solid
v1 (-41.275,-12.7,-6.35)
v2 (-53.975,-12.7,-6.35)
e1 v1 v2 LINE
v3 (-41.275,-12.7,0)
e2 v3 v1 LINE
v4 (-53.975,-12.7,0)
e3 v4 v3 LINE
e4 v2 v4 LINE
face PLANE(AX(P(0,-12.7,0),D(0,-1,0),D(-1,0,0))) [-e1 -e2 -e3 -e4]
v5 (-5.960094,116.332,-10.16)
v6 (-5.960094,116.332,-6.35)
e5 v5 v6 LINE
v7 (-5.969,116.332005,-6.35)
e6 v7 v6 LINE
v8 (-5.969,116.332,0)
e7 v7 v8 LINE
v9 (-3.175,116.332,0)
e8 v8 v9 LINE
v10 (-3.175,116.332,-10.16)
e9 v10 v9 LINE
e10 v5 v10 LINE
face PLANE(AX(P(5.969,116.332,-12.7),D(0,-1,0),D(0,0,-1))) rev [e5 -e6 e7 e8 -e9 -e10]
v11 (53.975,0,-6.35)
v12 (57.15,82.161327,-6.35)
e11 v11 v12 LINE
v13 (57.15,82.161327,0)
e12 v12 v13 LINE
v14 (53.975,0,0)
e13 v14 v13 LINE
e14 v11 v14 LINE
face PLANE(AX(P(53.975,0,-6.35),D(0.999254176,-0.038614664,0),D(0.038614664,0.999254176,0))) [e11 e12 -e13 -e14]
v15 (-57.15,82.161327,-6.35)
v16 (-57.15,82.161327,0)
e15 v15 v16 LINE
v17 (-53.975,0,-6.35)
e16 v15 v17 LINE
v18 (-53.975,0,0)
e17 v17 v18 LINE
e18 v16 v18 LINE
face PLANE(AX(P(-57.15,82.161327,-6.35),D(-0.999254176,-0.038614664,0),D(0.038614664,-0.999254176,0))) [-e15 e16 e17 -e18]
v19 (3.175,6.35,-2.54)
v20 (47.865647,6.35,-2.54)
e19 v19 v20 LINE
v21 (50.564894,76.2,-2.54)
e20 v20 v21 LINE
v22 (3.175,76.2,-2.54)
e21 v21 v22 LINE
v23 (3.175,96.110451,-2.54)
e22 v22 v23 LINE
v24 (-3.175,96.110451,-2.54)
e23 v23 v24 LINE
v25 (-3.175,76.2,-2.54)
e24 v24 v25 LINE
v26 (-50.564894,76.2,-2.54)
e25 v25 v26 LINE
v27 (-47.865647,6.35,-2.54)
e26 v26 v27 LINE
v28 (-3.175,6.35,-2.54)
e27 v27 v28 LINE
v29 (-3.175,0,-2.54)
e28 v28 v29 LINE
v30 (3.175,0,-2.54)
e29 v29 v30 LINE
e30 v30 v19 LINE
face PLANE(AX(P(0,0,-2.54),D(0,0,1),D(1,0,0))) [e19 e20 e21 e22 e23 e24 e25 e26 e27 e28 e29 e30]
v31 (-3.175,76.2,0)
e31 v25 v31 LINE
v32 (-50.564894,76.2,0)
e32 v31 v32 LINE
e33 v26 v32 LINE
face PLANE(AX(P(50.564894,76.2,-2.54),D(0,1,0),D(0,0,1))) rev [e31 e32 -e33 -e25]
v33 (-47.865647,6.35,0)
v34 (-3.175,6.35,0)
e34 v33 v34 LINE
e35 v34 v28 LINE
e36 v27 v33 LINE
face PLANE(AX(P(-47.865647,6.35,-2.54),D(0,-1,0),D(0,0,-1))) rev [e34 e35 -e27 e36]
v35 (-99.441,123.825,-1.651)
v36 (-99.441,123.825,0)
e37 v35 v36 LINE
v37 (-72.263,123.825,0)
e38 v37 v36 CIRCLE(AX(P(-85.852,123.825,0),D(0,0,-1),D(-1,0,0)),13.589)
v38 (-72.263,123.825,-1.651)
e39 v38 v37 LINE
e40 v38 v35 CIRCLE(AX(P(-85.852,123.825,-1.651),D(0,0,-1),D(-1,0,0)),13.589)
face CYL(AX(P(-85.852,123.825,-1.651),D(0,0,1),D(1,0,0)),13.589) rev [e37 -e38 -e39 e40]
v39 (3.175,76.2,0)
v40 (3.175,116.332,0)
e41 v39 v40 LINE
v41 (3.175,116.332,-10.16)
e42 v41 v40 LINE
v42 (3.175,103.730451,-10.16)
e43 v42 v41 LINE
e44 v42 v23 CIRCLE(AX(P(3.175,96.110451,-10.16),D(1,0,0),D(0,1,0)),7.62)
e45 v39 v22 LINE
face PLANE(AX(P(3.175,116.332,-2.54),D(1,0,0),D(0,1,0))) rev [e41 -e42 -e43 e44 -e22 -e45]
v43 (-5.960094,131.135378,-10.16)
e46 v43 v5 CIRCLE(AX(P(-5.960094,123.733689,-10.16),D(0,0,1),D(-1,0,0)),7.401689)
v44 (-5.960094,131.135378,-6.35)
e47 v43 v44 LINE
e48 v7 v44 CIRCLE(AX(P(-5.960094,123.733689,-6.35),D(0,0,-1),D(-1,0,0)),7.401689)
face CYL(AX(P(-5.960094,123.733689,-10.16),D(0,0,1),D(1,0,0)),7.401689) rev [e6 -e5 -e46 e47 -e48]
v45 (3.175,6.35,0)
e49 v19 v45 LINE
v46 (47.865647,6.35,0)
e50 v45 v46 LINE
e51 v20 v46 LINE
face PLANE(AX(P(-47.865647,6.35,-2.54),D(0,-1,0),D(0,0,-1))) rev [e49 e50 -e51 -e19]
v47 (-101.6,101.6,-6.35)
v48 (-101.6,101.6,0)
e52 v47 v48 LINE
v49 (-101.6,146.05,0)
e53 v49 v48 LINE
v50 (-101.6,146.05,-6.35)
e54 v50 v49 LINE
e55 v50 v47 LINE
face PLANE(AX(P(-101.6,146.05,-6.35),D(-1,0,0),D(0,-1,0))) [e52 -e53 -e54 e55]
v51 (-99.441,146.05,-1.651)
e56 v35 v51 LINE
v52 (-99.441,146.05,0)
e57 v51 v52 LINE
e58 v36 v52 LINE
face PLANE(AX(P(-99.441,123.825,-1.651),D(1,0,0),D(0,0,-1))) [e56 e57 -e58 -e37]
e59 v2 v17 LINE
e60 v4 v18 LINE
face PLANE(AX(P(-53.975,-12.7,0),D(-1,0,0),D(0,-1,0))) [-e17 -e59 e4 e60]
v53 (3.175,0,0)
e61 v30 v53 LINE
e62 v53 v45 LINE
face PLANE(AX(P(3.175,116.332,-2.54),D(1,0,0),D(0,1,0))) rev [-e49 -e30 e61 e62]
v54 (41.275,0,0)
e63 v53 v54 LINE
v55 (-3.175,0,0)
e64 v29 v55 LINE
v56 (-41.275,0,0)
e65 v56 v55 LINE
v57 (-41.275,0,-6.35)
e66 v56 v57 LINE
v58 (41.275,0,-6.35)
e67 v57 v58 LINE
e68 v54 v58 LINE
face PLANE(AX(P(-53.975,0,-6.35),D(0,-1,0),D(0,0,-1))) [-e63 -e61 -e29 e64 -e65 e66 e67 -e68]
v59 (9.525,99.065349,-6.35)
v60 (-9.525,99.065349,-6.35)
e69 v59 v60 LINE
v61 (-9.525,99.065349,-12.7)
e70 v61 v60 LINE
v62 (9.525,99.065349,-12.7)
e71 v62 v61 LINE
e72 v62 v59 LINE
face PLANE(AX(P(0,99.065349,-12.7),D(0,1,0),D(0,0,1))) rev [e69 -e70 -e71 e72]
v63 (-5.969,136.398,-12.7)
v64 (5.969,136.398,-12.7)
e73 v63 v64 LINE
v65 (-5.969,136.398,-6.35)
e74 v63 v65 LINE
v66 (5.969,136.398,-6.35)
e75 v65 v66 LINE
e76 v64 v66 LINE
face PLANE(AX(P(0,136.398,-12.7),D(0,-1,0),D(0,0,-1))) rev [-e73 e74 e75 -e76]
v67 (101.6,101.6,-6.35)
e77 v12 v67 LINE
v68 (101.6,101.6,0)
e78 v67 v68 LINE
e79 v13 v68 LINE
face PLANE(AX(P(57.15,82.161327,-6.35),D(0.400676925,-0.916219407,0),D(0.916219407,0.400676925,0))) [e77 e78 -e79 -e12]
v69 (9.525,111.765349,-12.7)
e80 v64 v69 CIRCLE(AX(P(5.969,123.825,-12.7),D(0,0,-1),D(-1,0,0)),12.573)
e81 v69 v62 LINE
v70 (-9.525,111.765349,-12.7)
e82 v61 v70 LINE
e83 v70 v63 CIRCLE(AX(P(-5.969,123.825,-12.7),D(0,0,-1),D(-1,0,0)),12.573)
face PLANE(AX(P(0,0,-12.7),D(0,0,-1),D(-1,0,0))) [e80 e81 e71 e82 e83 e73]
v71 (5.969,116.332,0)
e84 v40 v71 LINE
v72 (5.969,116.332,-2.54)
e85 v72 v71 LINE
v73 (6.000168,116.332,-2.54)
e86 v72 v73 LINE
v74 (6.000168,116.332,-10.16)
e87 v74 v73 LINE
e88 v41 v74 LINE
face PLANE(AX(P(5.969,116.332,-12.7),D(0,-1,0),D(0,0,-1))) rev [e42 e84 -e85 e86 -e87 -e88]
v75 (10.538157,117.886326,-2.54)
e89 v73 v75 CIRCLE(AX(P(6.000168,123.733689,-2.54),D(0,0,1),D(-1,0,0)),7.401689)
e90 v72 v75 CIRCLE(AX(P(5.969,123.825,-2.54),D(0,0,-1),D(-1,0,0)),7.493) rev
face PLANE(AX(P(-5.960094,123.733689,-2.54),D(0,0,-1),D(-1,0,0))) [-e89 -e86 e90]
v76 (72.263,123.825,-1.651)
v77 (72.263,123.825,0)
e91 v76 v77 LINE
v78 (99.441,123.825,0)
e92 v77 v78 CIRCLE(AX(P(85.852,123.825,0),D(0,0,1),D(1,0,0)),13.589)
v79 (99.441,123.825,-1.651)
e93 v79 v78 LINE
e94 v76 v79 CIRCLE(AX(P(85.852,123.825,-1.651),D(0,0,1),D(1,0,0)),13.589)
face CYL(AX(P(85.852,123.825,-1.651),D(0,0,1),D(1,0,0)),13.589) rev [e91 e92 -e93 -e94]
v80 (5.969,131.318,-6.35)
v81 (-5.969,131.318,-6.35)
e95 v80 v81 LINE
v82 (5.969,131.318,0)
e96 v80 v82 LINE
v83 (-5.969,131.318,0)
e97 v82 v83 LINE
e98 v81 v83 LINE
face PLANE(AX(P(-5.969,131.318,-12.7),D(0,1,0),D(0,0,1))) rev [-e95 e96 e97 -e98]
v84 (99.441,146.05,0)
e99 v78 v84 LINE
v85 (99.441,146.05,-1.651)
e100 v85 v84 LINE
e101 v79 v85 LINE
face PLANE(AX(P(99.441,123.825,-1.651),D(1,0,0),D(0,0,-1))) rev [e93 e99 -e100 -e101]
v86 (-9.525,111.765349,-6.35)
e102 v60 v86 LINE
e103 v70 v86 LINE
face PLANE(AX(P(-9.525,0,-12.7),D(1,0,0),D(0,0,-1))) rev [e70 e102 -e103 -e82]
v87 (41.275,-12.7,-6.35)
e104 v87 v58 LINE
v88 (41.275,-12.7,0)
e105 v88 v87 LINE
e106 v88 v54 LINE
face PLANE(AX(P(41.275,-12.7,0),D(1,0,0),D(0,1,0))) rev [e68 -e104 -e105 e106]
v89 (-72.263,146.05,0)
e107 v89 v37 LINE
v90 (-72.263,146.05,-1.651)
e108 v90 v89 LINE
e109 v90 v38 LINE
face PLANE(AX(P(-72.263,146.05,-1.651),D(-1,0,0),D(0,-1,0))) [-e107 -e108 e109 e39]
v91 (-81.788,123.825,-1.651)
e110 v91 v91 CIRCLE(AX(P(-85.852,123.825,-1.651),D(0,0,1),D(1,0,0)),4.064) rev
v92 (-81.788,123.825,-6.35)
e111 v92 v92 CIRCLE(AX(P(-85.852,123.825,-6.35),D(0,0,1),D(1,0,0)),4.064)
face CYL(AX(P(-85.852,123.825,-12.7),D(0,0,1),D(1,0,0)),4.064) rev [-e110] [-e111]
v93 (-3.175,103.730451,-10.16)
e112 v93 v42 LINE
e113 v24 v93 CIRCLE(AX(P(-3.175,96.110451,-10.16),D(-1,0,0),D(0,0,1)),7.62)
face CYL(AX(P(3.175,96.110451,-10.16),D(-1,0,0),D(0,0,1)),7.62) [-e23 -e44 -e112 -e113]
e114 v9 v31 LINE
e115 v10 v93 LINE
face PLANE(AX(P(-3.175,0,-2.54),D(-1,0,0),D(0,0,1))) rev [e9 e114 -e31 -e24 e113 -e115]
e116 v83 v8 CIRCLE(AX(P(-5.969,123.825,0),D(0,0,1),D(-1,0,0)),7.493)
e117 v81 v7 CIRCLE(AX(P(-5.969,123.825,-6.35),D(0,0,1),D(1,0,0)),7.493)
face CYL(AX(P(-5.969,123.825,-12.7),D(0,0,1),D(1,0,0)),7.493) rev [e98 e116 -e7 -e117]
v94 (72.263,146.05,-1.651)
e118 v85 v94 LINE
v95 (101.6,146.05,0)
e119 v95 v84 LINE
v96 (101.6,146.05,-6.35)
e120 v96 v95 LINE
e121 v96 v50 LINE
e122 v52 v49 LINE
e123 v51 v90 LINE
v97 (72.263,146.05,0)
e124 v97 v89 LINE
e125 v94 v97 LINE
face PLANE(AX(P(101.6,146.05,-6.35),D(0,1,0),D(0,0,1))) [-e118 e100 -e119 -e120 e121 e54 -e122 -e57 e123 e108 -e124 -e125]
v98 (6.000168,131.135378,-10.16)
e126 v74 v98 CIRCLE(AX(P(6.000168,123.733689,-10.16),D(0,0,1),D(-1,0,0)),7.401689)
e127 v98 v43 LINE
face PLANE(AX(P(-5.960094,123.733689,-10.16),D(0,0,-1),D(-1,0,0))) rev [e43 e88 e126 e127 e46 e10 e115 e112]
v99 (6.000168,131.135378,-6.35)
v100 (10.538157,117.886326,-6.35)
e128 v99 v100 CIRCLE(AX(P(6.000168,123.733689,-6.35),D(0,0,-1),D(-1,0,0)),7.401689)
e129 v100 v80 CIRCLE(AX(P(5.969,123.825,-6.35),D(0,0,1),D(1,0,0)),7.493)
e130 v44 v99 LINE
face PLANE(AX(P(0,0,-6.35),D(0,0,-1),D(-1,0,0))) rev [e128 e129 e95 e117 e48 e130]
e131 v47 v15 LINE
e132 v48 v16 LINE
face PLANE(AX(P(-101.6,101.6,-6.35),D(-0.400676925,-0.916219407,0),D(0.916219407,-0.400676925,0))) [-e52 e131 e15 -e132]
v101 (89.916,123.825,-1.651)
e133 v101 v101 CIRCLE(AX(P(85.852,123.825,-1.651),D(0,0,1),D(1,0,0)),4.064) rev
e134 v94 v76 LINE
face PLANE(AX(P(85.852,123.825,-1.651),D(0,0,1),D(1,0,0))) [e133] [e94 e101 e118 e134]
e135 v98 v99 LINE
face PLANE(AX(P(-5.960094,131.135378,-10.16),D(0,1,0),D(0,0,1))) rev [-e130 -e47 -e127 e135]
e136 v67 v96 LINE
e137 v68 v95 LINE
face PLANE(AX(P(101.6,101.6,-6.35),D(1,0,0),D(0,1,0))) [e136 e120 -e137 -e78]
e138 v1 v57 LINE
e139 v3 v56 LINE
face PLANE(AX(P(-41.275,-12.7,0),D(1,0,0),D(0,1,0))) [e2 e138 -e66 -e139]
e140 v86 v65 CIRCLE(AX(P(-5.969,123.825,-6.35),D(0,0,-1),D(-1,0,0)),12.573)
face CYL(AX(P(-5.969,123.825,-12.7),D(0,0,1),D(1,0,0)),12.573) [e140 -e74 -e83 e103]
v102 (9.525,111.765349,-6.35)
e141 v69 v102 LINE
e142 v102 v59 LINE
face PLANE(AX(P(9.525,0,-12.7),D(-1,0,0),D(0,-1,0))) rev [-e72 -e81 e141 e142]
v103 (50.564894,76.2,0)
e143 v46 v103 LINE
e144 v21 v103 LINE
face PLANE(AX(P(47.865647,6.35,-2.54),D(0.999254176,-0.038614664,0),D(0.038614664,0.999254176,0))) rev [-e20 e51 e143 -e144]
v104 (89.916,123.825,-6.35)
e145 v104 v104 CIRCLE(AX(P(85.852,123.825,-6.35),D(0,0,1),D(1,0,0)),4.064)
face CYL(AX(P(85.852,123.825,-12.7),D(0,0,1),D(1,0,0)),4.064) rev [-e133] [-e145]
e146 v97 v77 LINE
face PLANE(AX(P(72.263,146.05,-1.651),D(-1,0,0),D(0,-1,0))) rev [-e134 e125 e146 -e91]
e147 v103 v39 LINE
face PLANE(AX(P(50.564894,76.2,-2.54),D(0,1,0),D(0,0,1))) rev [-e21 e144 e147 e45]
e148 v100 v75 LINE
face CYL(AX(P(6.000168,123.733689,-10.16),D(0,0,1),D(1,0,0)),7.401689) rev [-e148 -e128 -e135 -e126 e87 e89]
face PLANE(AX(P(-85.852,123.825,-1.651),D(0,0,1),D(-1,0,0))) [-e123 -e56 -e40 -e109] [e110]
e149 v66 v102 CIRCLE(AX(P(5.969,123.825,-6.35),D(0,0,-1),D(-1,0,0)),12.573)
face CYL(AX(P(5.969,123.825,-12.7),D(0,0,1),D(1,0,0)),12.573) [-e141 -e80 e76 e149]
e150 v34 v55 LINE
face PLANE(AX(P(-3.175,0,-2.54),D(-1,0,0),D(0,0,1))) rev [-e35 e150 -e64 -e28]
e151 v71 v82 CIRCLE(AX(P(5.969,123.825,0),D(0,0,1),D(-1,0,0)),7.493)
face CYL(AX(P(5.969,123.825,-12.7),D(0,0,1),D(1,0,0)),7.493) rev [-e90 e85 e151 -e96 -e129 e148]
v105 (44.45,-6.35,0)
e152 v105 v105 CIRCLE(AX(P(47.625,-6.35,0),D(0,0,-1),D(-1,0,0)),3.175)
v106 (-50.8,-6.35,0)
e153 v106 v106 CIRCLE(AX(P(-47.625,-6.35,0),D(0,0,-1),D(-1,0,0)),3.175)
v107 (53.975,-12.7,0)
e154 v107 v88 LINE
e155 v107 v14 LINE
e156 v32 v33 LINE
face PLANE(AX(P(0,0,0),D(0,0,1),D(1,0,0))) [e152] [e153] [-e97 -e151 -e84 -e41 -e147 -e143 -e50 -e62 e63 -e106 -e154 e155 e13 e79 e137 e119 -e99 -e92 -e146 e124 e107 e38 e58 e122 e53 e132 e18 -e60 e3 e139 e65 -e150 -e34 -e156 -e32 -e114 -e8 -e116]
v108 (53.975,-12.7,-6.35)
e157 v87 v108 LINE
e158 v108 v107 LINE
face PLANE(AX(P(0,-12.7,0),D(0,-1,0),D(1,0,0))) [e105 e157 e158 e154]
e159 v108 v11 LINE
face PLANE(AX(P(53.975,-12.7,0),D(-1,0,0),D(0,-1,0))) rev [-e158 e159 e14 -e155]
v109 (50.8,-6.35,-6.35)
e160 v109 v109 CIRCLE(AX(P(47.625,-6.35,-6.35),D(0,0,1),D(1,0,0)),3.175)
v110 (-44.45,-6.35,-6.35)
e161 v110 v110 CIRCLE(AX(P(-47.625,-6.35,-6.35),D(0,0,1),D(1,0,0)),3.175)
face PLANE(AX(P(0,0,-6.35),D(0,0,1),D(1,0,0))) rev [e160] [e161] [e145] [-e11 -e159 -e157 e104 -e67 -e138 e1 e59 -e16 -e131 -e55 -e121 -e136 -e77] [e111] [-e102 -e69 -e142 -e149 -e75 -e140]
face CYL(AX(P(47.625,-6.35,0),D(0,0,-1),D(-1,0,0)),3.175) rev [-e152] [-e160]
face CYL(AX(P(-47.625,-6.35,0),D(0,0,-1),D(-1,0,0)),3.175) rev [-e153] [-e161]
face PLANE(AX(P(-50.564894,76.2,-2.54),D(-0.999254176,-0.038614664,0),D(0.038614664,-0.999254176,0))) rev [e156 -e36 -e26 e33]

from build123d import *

# Parameters (mm, degrees)
MAIN_BODY_DEPTH          = 6.35
BATTERY_SPACING_DEPTH    = 2.54
SKETCH8_R                = 4.064
LIGHT_SOCKETS_DEPTH      = 12.7
LIGHT_LEADS_POCKET_DEPTH = 6.35
WIRE_TRAIL_DEPTH         = 2.54
LEAD_ROOM_DEPTH          = 7.62
FILLET1_R                = 7.62
TAB_SLOTS_DEPTH          = 1.651
SKETCH14_W               = 12.7
SKETCH14_H               = 6.35
SCREW_MOUNT_DEPTH        = 12.7
CUT_EXTRUDE1_DEPTH       = 179.026641265
CUT_EXTRUDE1_DEPTH_BACK  = 179.026641265
SKETCH15_R               = 3.175


# Sheet-metal steps are written as plain solids
with BuildPart() as part:
    # Sketch1 → Main Body (new body)
    with BuildSketch(Plane.XY):
        Polygon((-53.975, 0), (53.975, 0), (57.15, 82.161327118), (101.6, 101.6), (101.6, 146.05), (-101.6, 146.05), (-101.6, 101.6), (-57.15, 82.161327118), align=None)
    extrude(amount=-MAIN_BODY_DEPTH)

    # Sketch7 → Battery Spacing (cut)
    with BuildSketch(Plane.XY):
        Polygon((-50.564894027, 76.2), (-47.86564661, 6.35), (47.86564661, 6.35), (50.564894027, 76.2), align=None)
    extrude(amount=-BATTERY_SPACING_DEPTH, mode=Mode.SUBTRACT)

    # Sketch8 → Light Sockets (cut)
    with BuildSketch(Plane.XY):
        with Locations((85.852, 123.825)):
            Circle(SKETCH8_R)
        with Locations((-85.852, 123.825)):
            Circle(SKETCH8_R)
        with BuildLine():
            Line((-5.969, 131.318), (5.969, 131.318))
            ThreePointArc((5.969, 131.318), (13.462, 123.825), (5.969, 116.332))
            Line((5.969, 116.332), (-5.969, 116.332))
            ThreePointArc((-5.969, 116.332), (-13.462, 123.825), (-5.969, 131.318))
        make_face()
    extrude(amount=-LIGHT_SOCKETS_DEPTH, mode=Mode.SUBTRACT)

    # Sketch9 → Light Leads Pocket (add)
    with BuildSketch(Plane(origin=(0, 0, -6.35), x_dir=(-1, 0, 0), z_dir=(0, 0, -1))):
        with BuildLine():
            Line((-9.525, 111.765348554), (-9.525, 99.065348554))
            Line((-9.525, 99.065348554), (9.525, 99.065348554))
            Line((9.525, 99.065348554), (9.525, 111.765348554))
            ThreePointArc((9.525, 111.765348554), (18.413001098, 125.621431375), (5.969, 136.398))
            Line((5.969, 136.398), (-5.969, 136.398))
            ThreePointArc((-5.969, 136.398), (-18.413001098, 125.621431375), (-9.525, 111.765348554))
        make_face()
    extrude(amount=LIGHT_LEADS_POCKET_DEPTH)

    # Sketch10 → Wire Trail (cut)
    with BuildSketch(Plane.XY):
        Polygon((-3.175, 116.332), (3.175, 116.332), (3.175, 76.2), (3.175, 6.35), (3.175, 0), (-3.175, 0), align=None)
    extrude(amount=-WIRE_TRAIL_DEPTH, mode=Mode.SUBTRACT)

    # Sketch12 → Lead Room (cut)
    with BuildSketch(Plane.XY.offset(-2.54)):
        with BuildLine():
            Line((-3.175, 116.332), (-5.960094489, 116.332))
            ThreePointArc((-5.960094489, 116.332), (-13.36178344, 123.73368895), (-5.960094489, 131.135377901))
            Line((-5.960094489, 131.135377901), (6.000168296, 131.135377901))
            ThreePointArc((6.000168296, 131.135377901), (13.401857247, 123.73368895), (6.000168296, 116.332))
            Line((6.000168296, 116.332), (3.175, 116.332))
            Line((3.175, 116.332), (3.175, 103.730451358))
            Line((3.175, 103.730451358), (-3.175, 103.730451358))
            Line((-3.175, 103.730451358), (-3.175, 116.332))
        make_face()
    extrude(amount=-LEAD_ROOM_DEPTH, mode=Mode.SUBTRACT)

    # Fillet1
    fillet1_edges = [part.edges().sort_by_distance(p)[0] for p in [
        (0, 103.730451358, -2.54),
    ]]
    fillet(fillet1_edges, radius=FILLET1_R - 0.0001)  # a hair under: the kernel refuses the full size

    # Sketch13 → Tab Slots (cut)
    with BuildSketch(Plane.XY):
        with BuildLine():
            Line((72.263, 146.05), (72.263, 123.825))
            ThreePointArc((72.263, 123.825), (85.852, 110.236), (99.441, 123.825))
            Line((99.441, 123.825), (99.441, 146.05))
            Line((99.441, 146.05), (72.263, 146.05))
        make_face()
    tab_slots = extrude(amount=-TAB_SLOTS_DEPTH, mode=Mode.SUBTRACT)

    # Mirror1: Tab Slots across plane
    add(tab_slots.mirror(Plane(origin=(0, 0, 0), x_dir=(0, 0, 1), z_dir=(1, 0, 0))), mode=Mode.SUBTRACT)

    # Sketch14 → Screw Mount (add)
    with BuildSketch(Plane.XZ):
        with Locations((47.625, -3.175)):
            Rectangle(SKETCH14_W, SKETCH14_H)
    screw_mount = extrude(amount=SCREW_MOUNT_DEPTH)

    # Mirror2: Screw Mount across plane
    add(screw_mount.mirror(Plane(origin=(0, 0, 0), x_dir=(0, 0, 1), z_dir=(1, 0, 0))))

    # Sketch15 → Cut-Extrude1 (cut, two sides: drawn at the far end of the back side and taken through both)
    with BuildSketch(Plane(origin=(0, 0, -6.35), x_dir=(-1, 0, 0), z_dir=(0, 0, -1)).offset(-CUT_EXTRUDE1_DEPTH_BACK)):
        with Locations((47.625, -6.35)):
            Circle(SKETCH15_R)
        with Locations((-47.625, -6.35)):
            Circle(SKETCH15_R)
    extrude(amount=CUT_EXTRUDE1_DEPTH + CUT_EXTRUDE1_DEPTH_BACK, mode=Mode.SUBTRACT)


solid = part.part
